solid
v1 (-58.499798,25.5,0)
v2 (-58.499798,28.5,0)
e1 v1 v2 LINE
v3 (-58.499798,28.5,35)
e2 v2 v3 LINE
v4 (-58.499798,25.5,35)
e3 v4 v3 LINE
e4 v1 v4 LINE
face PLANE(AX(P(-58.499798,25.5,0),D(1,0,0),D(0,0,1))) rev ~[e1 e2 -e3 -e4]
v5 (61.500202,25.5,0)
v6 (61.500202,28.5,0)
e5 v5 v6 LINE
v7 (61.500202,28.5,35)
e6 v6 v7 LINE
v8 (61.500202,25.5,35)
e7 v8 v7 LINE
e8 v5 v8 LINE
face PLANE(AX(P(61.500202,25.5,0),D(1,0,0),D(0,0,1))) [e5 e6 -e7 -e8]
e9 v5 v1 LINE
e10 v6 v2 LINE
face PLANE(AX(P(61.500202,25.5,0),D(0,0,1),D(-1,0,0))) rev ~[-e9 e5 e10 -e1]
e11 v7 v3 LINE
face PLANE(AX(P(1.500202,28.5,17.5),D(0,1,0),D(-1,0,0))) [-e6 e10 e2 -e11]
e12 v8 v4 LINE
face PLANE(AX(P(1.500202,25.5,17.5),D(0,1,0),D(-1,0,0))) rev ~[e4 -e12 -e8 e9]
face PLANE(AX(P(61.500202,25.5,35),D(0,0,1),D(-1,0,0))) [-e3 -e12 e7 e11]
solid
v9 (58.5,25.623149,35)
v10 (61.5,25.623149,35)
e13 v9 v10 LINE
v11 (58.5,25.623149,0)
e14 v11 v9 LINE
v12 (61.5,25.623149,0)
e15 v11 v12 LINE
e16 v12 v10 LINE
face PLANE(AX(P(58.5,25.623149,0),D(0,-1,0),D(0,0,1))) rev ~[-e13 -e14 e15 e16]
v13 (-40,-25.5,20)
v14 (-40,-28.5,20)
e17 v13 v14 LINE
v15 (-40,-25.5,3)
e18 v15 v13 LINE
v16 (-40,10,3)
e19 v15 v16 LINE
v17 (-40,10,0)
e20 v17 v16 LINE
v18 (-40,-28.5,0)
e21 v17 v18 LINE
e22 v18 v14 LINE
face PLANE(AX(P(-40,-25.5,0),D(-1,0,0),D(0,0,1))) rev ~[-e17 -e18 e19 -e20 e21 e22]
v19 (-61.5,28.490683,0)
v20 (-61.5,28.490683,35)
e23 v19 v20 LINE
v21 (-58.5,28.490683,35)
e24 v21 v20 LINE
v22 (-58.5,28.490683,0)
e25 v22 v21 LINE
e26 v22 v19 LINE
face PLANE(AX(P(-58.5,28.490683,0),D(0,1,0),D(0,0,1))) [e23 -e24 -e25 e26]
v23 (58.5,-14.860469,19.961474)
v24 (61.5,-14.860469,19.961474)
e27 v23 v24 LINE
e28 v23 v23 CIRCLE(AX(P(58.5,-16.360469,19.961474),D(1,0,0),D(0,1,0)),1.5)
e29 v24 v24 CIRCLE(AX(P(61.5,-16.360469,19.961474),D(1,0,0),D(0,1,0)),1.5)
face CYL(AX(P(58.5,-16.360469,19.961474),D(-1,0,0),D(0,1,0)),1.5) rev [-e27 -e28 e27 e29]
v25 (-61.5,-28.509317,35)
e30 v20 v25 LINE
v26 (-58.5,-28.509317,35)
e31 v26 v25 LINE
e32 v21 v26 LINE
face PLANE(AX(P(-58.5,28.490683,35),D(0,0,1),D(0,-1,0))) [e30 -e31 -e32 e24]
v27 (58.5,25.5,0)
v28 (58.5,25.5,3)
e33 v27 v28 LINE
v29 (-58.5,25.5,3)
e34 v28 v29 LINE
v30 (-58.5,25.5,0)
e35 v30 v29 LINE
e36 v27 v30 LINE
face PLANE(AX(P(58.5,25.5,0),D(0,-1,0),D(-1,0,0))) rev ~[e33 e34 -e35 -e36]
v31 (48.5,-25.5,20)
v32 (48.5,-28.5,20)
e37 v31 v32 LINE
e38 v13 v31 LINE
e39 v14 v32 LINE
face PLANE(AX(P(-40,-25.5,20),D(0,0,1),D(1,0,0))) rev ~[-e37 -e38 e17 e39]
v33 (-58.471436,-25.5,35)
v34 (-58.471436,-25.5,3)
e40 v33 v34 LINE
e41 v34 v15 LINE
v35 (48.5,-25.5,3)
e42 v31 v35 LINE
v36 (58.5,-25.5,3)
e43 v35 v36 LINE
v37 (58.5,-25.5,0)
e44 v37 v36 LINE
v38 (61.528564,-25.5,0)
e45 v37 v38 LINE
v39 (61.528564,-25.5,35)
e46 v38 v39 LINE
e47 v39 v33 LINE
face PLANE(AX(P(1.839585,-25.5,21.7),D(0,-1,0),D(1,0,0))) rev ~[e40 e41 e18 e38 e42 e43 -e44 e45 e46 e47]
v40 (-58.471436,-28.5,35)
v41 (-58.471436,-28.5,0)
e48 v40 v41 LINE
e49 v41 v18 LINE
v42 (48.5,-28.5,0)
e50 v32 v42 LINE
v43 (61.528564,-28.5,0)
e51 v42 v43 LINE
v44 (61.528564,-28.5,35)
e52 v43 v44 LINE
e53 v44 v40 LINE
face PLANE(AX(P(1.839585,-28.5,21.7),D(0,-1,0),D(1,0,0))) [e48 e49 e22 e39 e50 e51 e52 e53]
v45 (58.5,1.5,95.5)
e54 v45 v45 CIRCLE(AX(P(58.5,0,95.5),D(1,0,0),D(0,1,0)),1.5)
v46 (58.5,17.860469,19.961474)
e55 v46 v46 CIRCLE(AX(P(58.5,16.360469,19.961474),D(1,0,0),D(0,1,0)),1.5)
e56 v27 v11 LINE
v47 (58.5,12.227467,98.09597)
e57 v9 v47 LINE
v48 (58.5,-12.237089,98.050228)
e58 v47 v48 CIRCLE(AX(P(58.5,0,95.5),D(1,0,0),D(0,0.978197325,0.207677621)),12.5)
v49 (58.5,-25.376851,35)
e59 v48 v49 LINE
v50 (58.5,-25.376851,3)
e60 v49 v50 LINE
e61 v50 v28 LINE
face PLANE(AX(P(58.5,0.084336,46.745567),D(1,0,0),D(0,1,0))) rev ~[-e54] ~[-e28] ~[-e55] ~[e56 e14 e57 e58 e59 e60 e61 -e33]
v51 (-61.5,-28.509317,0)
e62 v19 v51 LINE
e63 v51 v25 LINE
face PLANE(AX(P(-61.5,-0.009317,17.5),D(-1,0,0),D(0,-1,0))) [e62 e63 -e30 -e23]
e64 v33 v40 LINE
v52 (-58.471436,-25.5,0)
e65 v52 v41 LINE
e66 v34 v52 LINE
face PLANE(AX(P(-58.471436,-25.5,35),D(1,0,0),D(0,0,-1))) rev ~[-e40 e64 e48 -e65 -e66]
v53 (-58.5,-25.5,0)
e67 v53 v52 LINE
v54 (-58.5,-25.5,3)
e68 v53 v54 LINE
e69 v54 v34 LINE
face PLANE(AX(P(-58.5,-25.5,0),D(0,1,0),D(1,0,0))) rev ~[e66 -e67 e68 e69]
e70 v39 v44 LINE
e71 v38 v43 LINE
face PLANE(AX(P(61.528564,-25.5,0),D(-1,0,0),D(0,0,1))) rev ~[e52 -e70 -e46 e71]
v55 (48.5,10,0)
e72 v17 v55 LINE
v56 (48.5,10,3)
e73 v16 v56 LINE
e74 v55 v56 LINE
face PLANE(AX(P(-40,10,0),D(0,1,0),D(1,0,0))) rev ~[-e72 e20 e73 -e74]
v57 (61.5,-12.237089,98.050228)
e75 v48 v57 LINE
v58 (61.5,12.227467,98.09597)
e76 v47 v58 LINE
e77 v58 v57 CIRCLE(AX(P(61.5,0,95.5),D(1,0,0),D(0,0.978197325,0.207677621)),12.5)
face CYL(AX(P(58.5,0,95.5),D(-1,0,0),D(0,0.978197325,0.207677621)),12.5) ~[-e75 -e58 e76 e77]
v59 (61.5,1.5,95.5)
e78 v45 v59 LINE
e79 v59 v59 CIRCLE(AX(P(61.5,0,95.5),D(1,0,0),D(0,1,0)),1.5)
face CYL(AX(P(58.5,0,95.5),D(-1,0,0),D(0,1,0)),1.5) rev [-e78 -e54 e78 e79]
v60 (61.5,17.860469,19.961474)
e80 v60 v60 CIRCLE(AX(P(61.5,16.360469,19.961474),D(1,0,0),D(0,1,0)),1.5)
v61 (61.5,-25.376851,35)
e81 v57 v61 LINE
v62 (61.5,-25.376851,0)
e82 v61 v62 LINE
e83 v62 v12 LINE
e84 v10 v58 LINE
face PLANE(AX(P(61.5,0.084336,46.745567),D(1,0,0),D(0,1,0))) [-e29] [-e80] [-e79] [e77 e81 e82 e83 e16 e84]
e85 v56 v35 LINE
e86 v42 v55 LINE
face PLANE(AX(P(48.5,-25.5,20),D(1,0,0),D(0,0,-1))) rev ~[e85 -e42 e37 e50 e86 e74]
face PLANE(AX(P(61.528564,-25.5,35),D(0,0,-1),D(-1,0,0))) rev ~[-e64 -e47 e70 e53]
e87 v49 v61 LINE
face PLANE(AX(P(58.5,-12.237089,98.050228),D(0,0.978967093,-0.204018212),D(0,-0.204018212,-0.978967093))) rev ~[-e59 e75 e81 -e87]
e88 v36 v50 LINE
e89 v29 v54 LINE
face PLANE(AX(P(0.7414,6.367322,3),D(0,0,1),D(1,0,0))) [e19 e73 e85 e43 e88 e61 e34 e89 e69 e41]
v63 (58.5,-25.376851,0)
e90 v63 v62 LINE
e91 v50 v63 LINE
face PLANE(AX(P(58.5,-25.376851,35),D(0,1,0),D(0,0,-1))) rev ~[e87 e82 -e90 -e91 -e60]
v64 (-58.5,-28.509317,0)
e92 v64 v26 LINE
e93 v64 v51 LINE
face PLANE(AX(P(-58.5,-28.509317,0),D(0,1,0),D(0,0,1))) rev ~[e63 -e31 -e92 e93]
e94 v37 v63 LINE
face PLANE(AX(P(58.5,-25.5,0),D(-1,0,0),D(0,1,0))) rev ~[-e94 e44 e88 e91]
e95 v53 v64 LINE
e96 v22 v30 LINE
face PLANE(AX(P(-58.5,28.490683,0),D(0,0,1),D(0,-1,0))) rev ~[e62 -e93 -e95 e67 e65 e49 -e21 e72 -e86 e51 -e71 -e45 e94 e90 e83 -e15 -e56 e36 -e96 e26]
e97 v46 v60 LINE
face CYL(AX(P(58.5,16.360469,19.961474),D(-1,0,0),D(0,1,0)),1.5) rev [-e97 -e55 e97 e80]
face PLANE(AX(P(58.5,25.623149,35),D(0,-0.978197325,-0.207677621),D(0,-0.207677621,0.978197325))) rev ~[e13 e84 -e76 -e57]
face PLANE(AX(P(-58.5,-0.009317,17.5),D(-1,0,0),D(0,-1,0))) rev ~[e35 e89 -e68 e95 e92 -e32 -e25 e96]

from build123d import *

# Parameters (mm, degrees)
F1_DEPTH  = 3
F3_R      = 1.5
F4_DEPTH  = 3
F7_DEPTH  = 3
F9_W      = 120
F9_H      = 35
F10_DEPTH = 3
F12_W     = 57
F12_H     = 35
F13_DEPTH = 3


with BuildPart() as f1:
    # F0 (on Top) → F1 (new body)
    with BuildSketch(Plane.XY):
        Polygon((58.5, 25.5), (-58.5, 25.5), (-58.5, -25.5), (-40, -25.5), (-40, 10), (48.5, 10), (48.5, -25.5), (58.5, -25.5), align=None)
    extrude(amount=F1_DEPTH)

    # F3 (on offset) → F4 (join)
    with BuildSketch(Plane.YZ.offset(58.5)):
        with BuildLine():
            Line((25.6231492609, 35), (12.2274665574, 98.0959702592))
            ThreePointArc((12.2274665574, 98.0959702592), (-0.0233718405, 107.9999781503), (-12.2370886636, 98.0502276446))
            Line((-12.2370886636, 98.0502276446), (-25.3768507391, 35))
            Line((-25.3768507391, 35), (-25.3768507391, 0))
            Line((-25.3768507391, 0), (25.6231492609, 0))
            Line((25.6231492609, 0), (25.6231492609, 35))
        make_face()
        with Locations((-16.3604691625, 19.9614744633)):
            Circle(F3_R, mode=Mode.SUBTRACT)
        with Locations((16.3604691625, 19.9614744633)):
            Circle(F3_R, mode=Mode.SUBTRACT)
        with Locations((0, 95.5)):
            Circle(F3_R, mode=Mode.SUBTRACT)
    extrude(amount=F4_DEPTH)

    # F6 (on offset) → F7 (join)
    with BuildSketch(Plane.XZ.offset(25.5)):
        Polygon((61.5285639184, 35), (-58.4714360816, 35), (-58.4714360816, 0), (-40, 0), (-40, 20), (48.5, 20), (48.5, 0), (61.5285639184, 0), align=None)
    extrude(amount=F7_DEPTH)

    # F12 (on offset) → F13 (join)
    with BuildSketch(Plane(origin=(-58.5, 0, 0), x_dir=(0, -1, 0), z_dir=(-1, 0, 0))):
        with Locations((0.0093167428, 17.5)):
            Rectangle(F12_W, F12_H)
    extrude(amount=F13_DEPTH)


with BuildPart() as f10:
    # F9 (on offset) → F10 (new body)
    with BuildSketch(Plane(origin=(0, 25.5, 0), x_dir=(-1, 0, 0), z_dir=(0, 1, 0))):
        with Locations((-1.5002019403, 17.5)):
            Rectangle(F9_W, F9_H)
    extrude(amount=F10_DEPTH)


solid = Compound([f1.part, f10.part])
